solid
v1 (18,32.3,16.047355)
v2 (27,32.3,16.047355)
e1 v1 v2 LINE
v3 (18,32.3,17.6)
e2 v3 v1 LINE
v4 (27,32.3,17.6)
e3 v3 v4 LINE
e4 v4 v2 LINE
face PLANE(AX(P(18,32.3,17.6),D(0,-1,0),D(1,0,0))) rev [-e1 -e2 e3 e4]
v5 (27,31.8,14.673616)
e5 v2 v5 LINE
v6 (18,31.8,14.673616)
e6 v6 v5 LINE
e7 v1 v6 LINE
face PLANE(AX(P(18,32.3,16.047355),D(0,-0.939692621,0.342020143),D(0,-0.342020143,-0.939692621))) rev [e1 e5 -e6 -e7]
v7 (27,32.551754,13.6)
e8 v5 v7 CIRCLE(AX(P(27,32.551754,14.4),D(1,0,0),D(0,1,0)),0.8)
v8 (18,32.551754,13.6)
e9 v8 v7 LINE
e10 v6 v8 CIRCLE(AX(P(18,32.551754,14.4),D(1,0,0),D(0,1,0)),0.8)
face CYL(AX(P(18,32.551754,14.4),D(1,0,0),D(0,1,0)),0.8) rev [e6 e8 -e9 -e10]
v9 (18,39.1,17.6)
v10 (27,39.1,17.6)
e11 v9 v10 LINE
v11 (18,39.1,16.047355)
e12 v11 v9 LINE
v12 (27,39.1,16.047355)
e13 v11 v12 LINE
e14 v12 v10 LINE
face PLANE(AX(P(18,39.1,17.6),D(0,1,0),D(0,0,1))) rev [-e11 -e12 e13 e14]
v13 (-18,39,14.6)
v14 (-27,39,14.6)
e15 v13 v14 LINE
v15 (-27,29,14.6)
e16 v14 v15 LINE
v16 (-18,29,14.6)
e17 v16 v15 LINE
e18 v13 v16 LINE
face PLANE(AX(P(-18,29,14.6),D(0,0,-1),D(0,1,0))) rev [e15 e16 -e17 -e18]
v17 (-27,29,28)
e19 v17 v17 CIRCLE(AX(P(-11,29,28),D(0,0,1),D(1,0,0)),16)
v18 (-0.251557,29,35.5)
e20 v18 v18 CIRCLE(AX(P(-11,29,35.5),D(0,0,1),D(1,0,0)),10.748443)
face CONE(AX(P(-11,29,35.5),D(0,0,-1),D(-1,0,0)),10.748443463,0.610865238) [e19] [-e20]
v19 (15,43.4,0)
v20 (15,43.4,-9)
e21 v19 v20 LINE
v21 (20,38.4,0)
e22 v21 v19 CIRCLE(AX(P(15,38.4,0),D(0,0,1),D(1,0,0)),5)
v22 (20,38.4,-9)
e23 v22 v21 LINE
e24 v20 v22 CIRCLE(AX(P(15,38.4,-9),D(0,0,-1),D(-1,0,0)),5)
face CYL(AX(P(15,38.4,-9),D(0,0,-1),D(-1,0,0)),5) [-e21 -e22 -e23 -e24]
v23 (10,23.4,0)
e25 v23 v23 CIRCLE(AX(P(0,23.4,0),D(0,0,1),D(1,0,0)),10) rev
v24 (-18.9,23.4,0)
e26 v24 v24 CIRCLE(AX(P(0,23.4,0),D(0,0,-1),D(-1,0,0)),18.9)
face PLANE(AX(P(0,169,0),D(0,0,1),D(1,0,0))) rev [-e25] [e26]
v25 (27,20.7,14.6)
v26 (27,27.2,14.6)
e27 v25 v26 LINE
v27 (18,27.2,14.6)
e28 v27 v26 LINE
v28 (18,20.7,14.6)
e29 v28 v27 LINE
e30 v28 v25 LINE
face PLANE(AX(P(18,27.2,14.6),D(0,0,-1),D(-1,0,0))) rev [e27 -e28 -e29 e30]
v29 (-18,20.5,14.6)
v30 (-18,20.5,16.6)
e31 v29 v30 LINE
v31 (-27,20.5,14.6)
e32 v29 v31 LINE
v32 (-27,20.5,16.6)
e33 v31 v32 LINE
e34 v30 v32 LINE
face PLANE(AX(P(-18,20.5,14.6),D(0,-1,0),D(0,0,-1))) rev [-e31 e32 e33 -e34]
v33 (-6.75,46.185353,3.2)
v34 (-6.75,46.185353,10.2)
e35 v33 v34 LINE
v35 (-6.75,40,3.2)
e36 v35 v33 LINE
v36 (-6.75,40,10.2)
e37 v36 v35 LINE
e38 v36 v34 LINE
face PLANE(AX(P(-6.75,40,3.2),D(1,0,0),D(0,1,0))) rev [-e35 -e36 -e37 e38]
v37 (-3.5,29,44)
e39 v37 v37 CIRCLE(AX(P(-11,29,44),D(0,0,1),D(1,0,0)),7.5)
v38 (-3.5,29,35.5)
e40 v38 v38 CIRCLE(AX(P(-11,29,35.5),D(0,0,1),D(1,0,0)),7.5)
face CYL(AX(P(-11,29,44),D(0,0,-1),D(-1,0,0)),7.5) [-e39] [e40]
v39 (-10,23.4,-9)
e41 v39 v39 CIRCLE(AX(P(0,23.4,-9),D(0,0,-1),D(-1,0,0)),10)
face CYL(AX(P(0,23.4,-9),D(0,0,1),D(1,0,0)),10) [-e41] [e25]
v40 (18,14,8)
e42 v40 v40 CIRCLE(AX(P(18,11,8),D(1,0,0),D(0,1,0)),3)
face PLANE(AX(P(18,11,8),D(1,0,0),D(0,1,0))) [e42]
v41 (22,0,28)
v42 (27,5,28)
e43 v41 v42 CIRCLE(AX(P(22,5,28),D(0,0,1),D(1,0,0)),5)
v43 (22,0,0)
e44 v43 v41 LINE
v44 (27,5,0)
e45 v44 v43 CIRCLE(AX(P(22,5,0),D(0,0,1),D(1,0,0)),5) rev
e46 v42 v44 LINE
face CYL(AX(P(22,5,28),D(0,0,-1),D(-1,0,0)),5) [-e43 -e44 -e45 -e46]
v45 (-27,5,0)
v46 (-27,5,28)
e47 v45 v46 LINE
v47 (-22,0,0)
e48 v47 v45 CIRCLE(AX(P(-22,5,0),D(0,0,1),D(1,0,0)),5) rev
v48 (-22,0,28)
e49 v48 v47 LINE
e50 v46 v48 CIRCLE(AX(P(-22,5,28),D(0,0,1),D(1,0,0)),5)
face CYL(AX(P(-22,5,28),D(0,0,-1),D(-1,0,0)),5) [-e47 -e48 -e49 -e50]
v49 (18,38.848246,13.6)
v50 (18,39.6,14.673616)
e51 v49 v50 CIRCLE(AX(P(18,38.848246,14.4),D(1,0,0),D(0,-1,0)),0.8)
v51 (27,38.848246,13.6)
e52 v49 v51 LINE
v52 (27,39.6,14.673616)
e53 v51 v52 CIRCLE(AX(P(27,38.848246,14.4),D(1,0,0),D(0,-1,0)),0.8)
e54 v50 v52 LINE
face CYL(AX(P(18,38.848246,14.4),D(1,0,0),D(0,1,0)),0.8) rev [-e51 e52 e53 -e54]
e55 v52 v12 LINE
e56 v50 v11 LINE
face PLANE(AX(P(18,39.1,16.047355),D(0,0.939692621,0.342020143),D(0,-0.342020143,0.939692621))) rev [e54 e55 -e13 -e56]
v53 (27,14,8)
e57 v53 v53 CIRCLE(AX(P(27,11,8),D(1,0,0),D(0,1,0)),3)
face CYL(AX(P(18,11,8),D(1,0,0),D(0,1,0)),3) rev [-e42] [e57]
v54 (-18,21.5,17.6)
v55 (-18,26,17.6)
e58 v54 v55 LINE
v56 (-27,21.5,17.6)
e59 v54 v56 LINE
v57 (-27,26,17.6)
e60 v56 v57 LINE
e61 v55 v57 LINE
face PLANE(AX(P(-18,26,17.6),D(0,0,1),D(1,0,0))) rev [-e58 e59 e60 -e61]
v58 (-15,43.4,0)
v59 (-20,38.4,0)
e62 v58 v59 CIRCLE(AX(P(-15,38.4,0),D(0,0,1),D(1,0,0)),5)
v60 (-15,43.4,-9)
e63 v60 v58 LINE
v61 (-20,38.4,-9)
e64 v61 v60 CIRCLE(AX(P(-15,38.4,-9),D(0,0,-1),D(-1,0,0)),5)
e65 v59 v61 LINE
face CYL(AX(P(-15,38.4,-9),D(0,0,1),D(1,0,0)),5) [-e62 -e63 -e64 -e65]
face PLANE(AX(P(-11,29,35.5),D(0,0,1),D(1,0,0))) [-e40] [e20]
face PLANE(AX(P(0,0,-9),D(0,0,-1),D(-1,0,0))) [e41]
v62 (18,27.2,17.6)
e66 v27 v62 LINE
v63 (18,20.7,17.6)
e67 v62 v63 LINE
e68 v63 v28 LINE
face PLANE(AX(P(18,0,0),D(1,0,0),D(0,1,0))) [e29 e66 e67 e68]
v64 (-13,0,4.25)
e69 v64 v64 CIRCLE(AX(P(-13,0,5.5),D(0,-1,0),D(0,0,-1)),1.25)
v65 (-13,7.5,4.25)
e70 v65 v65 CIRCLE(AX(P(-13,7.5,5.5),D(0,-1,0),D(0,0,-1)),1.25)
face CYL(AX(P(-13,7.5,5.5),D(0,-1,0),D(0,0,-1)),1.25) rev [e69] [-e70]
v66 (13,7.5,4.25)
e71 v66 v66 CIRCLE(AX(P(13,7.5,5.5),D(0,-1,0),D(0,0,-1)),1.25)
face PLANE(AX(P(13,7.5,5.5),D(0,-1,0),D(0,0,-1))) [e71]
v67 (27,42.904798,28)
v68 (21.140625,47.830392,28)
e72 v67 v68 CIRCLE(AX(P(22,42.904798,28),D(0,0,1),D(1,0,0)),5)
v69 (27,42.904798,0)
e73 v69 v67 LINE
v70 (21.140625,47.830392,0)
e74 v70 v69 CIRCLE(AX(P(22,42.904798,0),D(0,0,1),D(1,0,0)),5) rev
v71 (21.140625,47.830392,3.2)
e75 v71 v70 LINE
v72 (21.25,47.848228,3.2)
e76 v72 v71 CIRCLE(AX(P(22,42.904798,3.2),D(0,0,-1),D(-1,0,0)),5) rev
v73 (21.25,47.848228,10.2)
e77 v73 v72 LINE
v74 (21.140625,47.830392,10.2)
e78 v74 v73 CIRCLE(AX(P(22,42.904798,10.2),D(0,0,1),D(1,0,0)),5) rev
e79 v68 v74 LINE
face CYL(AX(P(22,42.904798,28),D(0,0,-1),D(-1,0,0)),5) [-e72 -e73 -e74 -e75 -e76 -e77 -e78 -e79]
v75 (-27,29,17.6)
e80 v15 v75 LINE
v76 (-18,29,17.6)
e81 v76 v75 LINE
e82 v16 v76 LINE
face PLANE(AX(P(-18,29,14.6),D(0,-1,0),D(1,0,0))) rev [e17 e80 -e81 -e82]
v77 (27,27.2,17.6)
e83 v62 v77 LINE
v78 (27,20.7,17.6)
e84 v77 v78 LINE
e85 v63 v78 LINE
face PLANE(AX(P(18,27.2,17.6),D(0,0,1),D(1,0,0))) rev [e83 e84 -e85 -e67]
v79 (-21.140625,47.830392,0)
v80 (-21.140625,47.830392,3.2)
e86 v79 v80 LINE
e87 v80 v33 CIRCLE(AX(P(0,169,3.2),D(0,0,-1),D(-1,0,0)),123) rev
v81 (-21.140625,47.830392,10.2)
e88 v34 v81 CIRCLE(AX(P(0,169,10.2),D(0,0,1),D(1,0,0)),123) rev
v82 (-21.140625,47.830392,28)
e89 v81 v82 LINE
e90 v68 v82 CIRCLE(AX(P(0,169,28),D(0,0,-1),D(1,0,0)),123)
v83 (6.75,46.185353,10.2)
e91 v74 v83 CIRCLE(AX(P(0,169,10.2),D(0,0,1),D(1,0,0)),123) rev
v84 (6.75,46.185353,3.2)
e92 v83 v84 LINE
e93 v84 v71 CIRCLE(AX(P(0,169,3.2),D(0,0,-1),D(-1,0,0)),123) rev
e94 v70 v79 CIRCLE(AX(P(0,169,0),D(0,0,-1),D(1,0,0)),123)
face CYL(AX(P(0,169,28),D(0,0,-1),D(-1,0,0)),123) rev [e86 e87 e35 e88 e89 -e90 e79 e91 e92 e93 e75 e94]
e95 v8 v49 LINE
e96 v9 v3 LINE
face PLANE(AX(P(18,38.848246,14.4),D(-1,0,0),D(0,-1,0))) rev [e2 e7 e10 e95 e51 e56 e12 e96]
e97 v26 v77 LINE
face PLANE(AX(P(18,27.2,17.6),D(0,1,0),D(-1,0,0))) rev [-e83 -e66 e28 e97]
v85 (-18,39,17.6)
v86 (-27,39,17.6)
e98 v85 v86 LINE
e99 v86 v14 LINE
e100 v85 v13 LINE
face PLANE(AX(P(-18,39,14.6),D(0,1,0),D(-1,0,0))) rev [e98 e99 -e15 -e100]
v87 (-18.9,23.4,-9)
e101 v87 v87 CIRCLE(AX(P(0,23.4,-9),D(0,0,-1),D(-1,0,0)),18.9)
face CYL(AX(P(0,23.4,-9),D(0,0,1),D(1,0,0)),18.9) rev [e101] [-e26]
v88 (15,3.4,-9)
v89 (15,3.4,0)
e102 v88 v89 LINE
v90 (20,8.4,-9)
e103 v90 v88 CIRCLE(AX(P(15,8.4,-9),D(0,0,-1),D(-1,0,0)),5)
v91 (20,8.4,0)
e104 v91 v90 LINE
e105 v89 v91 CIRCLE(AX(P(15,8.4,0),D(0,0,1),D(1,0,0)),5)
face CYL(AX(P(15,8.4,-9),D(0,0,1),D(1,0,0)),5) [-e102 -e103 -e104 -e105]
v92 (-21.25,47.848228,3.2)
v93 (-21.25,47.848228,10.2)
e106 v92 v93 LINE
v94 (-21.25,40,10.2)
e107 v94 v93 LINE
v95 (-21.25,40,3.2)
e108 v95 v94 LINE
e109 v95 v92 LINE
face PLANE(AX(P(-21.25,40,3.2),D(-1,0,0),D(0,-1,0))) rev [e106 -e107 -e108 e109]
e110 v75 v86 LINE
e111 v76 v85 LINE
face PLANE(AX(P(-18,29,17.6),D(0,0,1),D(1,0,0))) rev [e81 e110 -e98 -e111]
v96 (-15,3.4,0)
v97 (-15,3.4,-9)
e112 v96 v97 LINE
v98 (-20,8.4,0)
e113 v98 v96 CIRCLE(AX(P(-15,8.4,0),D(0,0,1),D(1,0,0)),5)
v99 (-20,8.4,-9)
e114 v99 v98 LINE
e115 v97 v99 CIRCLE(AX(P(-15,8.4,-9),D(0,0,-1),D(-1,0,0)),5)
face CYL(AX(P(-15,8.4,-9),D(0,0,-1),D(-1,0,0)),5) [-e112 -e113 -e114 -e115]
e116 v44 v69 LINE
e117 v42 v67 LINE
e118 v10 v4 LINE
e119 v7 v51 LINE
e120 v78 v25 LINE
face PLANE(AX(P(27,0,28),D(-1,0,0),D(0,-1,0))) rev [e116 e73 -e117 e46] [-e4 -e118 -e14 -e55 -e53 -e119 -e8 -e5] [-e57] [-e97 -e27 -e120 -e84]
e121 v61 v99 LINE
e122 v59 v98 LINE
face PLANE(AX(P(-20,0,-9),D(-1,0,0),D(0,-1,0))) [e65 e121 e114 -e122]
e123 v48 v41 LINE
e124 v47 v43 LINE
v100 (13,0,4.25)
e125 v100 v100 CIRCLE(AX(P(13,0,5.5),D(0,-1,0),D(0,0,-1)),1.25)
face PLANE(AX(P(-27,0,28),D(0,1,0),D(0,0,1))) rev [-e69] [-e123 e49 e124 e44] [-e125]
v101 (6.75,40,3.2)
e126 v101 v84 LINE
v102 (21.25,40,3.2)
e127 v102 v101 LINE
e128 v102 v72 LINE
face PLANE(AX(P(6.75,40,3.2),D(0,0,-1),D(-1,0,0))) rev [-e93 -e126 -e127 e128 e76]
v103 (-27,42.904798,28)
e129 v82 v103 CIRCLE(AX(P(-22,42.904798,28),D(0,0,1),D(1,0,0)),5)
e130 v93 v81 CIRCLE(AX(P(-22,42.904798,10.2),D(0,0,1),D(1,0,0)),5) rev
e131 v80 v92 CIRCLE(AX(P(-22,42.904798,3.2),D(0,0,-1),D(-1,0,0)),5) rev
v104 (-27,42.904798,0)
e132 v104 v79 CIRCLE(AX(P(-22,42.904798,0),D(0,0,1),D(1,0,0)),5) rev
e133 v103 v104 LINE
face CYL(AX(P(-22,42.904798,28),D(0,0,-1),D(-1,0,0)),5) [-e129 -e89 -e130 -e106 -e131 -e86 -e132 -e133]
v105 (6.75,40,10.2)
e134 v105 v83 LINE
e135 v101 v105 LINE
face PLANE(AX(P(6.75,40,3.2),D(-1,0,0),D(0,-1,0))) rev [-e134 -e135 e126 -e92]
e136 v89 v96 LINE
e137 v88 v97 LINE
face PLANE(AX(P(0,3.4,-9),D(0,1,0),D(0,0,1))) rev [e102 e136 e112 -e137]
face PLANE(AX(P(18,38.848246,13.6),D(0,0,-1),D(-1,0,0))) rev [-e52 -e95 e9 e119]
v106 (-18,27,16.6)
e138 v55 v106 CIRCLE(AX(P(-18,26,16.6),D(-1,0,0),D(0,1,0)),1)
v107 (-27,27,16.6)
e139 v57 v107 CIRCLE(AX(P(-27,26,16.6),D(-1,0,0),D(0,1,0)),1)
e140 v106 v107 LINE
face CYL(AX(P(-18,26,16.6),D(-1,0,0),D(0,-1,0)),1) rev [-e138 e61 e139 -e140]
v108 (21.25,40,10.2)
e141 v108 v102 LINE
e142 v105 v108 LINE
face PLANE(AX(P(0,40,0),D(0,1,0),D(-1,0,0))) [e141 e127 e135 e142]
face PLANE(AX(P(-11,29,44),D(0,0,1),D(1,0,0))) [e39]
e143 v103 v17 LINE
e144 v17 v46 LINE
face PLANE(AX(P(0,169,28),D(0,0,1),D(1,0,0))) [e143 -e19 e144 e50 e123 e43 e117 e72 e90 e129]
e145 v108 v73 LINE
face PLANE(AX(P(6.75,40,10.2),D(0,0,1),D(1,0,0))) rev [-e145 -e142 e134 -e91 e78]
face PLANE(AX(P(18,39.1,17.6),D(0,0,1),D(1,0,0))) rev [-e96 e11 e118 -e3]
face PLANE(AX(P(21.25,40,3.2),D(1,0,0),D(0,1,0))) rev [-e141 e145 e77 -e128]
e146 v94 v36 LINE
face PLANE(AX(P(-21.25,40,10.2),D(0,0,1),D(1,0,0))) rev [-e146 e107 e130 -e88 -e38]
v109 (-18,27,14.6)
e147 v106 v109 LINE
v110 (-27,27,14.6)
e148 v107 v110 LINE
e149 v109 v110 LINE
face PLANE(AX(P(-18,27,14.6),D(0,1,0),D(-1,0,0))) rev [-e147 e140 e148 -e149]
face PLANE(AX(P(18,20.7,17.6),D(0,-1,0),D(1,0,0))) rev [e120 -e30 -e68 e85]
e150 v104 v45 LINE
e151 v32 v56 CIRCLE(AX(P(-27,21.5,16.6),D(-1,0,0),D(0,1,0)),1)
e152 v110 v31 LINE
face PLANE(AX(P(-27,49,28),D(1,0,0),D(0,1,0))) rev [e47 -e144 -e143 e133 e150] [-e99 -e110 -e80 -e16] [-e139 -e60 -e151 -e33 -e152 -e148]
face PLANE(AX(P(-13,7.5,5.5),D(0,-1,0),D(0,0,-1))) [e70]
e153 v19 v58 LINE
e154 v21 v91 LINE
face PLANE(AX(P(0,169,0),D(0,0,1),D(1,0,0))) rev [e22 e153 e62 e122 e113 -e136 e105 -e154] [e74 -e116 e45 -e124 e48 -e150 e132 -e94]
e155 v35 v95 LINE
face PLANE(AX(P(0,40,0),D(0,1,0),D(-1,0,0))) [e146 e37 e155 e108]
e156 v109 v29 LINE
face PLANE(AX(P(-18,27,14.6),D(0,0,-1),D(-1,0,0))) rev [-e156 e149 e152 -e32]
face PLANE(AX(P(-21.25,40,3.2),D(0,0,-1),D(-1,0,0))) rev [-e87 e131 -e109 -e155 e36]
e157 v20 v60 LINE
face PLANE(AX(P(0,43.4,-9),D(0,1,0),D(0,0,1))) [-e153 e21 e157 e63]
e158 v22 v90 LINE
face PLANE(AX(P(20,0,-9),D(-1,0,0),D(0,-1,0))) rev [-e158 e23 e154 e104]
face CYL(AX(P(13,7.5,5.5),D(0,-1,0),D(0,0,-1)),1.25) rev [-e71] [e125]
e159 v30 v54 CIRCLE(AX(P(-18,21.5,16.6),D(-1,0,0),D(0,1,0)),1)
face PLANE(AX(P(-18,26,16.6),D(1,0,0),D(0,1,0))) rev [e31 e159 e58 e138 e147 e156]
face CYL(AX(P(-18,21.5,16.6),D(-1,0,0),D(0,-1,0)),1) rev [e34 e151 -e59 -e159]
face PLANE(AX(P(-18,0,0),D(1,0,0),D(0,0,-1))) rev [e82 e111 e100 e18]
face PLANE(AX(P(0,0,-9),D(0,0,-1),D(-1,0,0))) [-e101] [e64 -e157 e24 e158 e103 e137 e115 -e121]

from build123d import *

# Parameters (mm, degrees)
BOSS_EXTRU_1_DEPTH      = 28
ESQUISSE2_R             = 7.5
BOSS_EXTRU_2_DEPTH      = 16
ESQUISSE3_R             = 16
BOSS_EXTRU_3_DEPTH      = 7.5
CHANFREIN2_SIZE2        = 5.251556537
CHANFREIN2_SIZE         = 7.5
ESQUISSE4_R             = 1.25
ENL_V_MAT_EXTRU_1_DEPTH = 7.5
ESQUISSE5_W             = 40
ESQUISSE5_H             = 40
ESQUISSE5_R             = 18.9
ESQUISSE5_R_2           = 10
BOSS_EXTRU_4_DEPTH      = 9
ESQUISSE7_W             = 14.5
ESQUISSE7_H             = 7
ENL_V_MAT_EXTRU_2_DEPTH = 9
ESQUISSE8_W             = 3
ESQUISSE8_H             = 10
ENL_V_MAT_EXTRU_3_DEPTH = 9
ESQUISSE9_R             = 3
ESQUISSE9_W             = 3
ESQUISSE9_H             = 6.5
ENL_V_MAT_EXTRU_4_DEPTH = 9
CONG_2_R                = 5


# Some blends are built 0.0001 mm under size
with BuildPart() as part:
    # Esquisse1 → Boss.-Extru.1 (new body)
    with BuildSketch(Plane.XY):
        with BuildLine():
            Line((-27, 0), (27, 0))
            Line((27, 0), (27, 49))
            ThreePointArc((27, 49), (0, 46), (-27, 49))
            Line((-27, 49), (-27, 0))
        make_face()
    extrude(amount=BOSS_EXTRU_1_DEPTH)

    # Esquisse2 → Boss.-Extru.2 (add)
    with BuildSketch(Plane.XY.offset(28)):
        with Locations((-11, 29)):
            Circle(ESQUISSE2_R)
    extrude(amount=BOSS_EXTRU_2_DEPTH)

    # Esquisse3 → Boss.-Extru.3 (add)
    with BuildSketch(Plane.XY.offset(28)):
        with Locations(Location((-11, 29, 0), (0, 0, 180))):
            Circle(ESQUISSE3_R)
    extrude(amount=BOSS_EXTRU_3_DEPTH)

    # Chanfrein2
    chanfrein2_edges = [part.edges().sort_by_distance(p)[0] for p in [
        (5, 29, 35.5),
    ]]
    chanfrein2_side = [part.faces().sort_by_distance(p)[0] for p in [
        (5, 29, 35.394968869),
    ]]
    chamfer(chanfrein2_edges, length=CHANFREIN2_SIZE - 0.0001, length2=CHANFREIN2_SIZE2 - 0.0001, reference=chanfrein2_side[0])  # a hair under: the kernel refuses the full size

    # Esquisse4 → Enlèv. mat.-Extru.1 (cut)
    with BuildSketch(Plane.XZ):
        with Locations(Location((-13, 5.5, 0), (0, 0, 270))):
            Circle(ESQUISSE4_R)
        with Locations(Location((13, 5.5, 0), (0, 0, 270))):
            Circle(ESQUISSE4_R)
    extrude(amount=-ENL_V_MAT_EXTRU_1_DEPTH, mode=Mode.SUBTRACT)

    # Esquisse5 → Boss.-Extru.4 (add)
    # profile 1 of 2: a face of its own
    with BuildSketch(Plane(origin=(0, 0, 0), x_dir=(-1, 0, 0), z_dir=(0, 0, -1))):
        with Locations((0, 23.4)):
            Rectangle(ESQUISSE5_W, ESQUISSE5_H)
        with Locations((0, 23.4)):
            Circle(ESQUISSE5_R, mode=Mode.SUBTRACT)
    # profile 2 of 2: a face of its own
    with BuildSketch(Plane(origin=(0, 0, 0), x_dir=(-1, 0, 0), z_dir=(0, 0, -1))):
        with Locations(Location((0, 23.4, 0), (0, 0, 180))):
            Circle(ESQUISSE5_R_2)
    extrude(amount=BOSS_EXTRU_4_DEPTH)

    # Esquisse7 → Enlèv. mat.-Extru.2 (cut)
    with BuildSketch(Plane(origin=(0, 49, 0), x_dir=(1, 0, 0), z_dir=(0, 1, 0))):
        with Locations((-14, -6.7)):
            Rectangle(ESQUISSE7_W, ESQUISSE7_H)
        with Locations((14, -6.7)):
            Rectangle(ESQUISSE7_W, ESQUISSE7_H)
    extrude(amount=-ENL_V_MAT_EXTRU_2_DEPTH, mode=Mode.SUBTRACT)

    # Esquisse8 → Enlèv. mat.-Extru.3 (cut)
    with BuildSketch(Plane.ZY.offset(27)):
        with BuildLine():
            Line((14.6, 27), (14.6, 20.5))
            Line((14.6, 20.5), (16.6, 20.5))
            ThreePointArc((16.6, 20.5), (17.307106781, 20.792893219), (17.6, 21.5))
            Line((17.6, 21.5), (17.6, 26))
            ThreePointArc((17.6, 26), (17.307106781, 26.707106781), (16.6, 27))
            Line((16.6, 27), (14.6, 27))
        make_face()
        with Locations((16.1, 34)):
            Rectangle(ESQUISSE8_W, ESQUISSE8_H)
    extrude(amount=-ENL_V_MAT_EXTRU_3_DEPTH, mode=Mode.SUBTRACT)

    # Esquisse9 → Enlèv. mat.-Extru.4 (cut)
    with BuildSketch(Plane(origin=(27, 0, 0), x_dir=(0, 0, -1), z_dir=(1, 0, 0))):
        with Locations(Location((-8, 11, 0), (0, 0, 90))):
            Circle(ESQUISSE9_R)
        with BuildLine():
            Line((-17.6, 39.1), (-17.6, 32.3))
            Line((-17.6, 32.3), (-16.047354824, 32.3))
            Line((-16.047354824, 32.3), (-14.673616115, 31.8))
            ThreePointArc((-14.673616115, 31.8), (-13.941138851, 31.896432461), (-13.6, 32.551754097))
            Line((-13.6, 32.551754097), (-13.6, 38.848245903))
            ThreePointArc((-13.6, 38.848245903), (-13.941138851, 39.503567539), (-14.673616115, 39.6))
            Line((-14.673616115, 39.6), (-16.047354824, 39.1))
            Line((-16.047354824, 39.1), (-17.6, 39.1))
        make_face()
        with Locations((-16.1, 23.95)):
            Rectangle(ESQUISSE9_W, ESQUISSE9_H)
    extrude(amount=-ENL_V_MAT_EXTRU_4_DEPTH, mode=Mode.SUBTRACT)

    # Congé2
    # the kernel refuses this fillet: 5 mm, written as the material it takes off along each edge
    with BuildSketch(Plane(origin=(20, 3.4, 0), x_dir=(-1, 0, 0), z_dir=(0, 0, -1)), Plane(origin=(-20, 3.4, 0), x_dir=(0, 1, 0), z_dir=(0, 0, -1)), Plane(origin=(20, 43.4, 0), x_dir=(0, -1, 0), z_dir=(0, 0, -1))) as cong_2_piece_1:
        with BuildLine():
            CenterArc((CONG_2_R, CONG_2_R), CONG_2_R, 180, 90)
            Line((0, CONG_2_R), (0, 0))
            Line((0, 0), (CONG_2_R, 0))
        make_face()
    extrude(amount=21.5, mode=Mode.SUBTRACT)
    with BuildSketch(Plane(origin=(-20, 43.4, 0), x_dir=(0, -1, 0), z_dir=(0, 0, -1))) as cong_2_piece_2:
        with BuildLine():
            CenterArc((CONG_2_R, -CONG_2_R), CONG_2_R, 90, 90)
            Line((0, -CONG_2_R), (0, 0))
            Line((0, 0), (CONG_2_R, 0))
        make_face()
    extrude(amount=21.5, mode=Mode.SUBTRACT)
    with BuildSketch(Plane(origin=(-27, 49, -15.238005323), x_dir=(0.9806535629636468, -0.19575134596396773, 0), z_dir=(0, 0, 1))) as cong_2_piece_3:
        with BuildLine():
            CenterArc((6.096411836, -4.998524955), CONG_2_R, 91.391765025, 99.896853443)
            Line((1.193144021, -5.977281685), (0, 0))
            ThreePointArc((0, 0), (2.987484684, -0.036286103), (5.974969369, 0))
        make_face()
    extrude(amount=58.476010646, mode=Mode.SUBTRACT)
    with BuildSketch(Plane(origin=(-27, 0, -12.5), x_dir=(1, 0, 0), z_dir=(0, 0, 1)), Plane(origin=(27, 0, -12.5), x_dir=(0, 1, 0), z_dir=(0, 0, 1))) as cong_2_piece_4:
        with BuildLine():
            CenterArc((CONG_2_R, CONG_2_R), CONG_2_R, 180, 90)
            Line((0, CONG_2_R), (0, 0))
            Line((0, 0), (CONG_2_R, 0))
        make_face()
    extrude(amount=53, mode=Mode.SUBTRACT)
    with BuildSketch(Plane(origin=(27, 49, -15.238005323), x_dir=(-0.9806535629636471, -0.19575134596396557, 0), z_dir=(0, 0, 1))) as cong_2_piece_5:
        with BuildLine():
            CenterArc((6.096411836, 4.998524955), CONG_2_R, 168.711381533, 99.896853443)
            Line((1.193144021, 5.977281685), (0, 0))
            ThreePointArc((0, 0), (2.987484684, 0.036286103), (5.974969369, 0))
        make_face()
    extrude(amount=58.476010646, mode=Mode.SUBTRACT)


solid = part.part
